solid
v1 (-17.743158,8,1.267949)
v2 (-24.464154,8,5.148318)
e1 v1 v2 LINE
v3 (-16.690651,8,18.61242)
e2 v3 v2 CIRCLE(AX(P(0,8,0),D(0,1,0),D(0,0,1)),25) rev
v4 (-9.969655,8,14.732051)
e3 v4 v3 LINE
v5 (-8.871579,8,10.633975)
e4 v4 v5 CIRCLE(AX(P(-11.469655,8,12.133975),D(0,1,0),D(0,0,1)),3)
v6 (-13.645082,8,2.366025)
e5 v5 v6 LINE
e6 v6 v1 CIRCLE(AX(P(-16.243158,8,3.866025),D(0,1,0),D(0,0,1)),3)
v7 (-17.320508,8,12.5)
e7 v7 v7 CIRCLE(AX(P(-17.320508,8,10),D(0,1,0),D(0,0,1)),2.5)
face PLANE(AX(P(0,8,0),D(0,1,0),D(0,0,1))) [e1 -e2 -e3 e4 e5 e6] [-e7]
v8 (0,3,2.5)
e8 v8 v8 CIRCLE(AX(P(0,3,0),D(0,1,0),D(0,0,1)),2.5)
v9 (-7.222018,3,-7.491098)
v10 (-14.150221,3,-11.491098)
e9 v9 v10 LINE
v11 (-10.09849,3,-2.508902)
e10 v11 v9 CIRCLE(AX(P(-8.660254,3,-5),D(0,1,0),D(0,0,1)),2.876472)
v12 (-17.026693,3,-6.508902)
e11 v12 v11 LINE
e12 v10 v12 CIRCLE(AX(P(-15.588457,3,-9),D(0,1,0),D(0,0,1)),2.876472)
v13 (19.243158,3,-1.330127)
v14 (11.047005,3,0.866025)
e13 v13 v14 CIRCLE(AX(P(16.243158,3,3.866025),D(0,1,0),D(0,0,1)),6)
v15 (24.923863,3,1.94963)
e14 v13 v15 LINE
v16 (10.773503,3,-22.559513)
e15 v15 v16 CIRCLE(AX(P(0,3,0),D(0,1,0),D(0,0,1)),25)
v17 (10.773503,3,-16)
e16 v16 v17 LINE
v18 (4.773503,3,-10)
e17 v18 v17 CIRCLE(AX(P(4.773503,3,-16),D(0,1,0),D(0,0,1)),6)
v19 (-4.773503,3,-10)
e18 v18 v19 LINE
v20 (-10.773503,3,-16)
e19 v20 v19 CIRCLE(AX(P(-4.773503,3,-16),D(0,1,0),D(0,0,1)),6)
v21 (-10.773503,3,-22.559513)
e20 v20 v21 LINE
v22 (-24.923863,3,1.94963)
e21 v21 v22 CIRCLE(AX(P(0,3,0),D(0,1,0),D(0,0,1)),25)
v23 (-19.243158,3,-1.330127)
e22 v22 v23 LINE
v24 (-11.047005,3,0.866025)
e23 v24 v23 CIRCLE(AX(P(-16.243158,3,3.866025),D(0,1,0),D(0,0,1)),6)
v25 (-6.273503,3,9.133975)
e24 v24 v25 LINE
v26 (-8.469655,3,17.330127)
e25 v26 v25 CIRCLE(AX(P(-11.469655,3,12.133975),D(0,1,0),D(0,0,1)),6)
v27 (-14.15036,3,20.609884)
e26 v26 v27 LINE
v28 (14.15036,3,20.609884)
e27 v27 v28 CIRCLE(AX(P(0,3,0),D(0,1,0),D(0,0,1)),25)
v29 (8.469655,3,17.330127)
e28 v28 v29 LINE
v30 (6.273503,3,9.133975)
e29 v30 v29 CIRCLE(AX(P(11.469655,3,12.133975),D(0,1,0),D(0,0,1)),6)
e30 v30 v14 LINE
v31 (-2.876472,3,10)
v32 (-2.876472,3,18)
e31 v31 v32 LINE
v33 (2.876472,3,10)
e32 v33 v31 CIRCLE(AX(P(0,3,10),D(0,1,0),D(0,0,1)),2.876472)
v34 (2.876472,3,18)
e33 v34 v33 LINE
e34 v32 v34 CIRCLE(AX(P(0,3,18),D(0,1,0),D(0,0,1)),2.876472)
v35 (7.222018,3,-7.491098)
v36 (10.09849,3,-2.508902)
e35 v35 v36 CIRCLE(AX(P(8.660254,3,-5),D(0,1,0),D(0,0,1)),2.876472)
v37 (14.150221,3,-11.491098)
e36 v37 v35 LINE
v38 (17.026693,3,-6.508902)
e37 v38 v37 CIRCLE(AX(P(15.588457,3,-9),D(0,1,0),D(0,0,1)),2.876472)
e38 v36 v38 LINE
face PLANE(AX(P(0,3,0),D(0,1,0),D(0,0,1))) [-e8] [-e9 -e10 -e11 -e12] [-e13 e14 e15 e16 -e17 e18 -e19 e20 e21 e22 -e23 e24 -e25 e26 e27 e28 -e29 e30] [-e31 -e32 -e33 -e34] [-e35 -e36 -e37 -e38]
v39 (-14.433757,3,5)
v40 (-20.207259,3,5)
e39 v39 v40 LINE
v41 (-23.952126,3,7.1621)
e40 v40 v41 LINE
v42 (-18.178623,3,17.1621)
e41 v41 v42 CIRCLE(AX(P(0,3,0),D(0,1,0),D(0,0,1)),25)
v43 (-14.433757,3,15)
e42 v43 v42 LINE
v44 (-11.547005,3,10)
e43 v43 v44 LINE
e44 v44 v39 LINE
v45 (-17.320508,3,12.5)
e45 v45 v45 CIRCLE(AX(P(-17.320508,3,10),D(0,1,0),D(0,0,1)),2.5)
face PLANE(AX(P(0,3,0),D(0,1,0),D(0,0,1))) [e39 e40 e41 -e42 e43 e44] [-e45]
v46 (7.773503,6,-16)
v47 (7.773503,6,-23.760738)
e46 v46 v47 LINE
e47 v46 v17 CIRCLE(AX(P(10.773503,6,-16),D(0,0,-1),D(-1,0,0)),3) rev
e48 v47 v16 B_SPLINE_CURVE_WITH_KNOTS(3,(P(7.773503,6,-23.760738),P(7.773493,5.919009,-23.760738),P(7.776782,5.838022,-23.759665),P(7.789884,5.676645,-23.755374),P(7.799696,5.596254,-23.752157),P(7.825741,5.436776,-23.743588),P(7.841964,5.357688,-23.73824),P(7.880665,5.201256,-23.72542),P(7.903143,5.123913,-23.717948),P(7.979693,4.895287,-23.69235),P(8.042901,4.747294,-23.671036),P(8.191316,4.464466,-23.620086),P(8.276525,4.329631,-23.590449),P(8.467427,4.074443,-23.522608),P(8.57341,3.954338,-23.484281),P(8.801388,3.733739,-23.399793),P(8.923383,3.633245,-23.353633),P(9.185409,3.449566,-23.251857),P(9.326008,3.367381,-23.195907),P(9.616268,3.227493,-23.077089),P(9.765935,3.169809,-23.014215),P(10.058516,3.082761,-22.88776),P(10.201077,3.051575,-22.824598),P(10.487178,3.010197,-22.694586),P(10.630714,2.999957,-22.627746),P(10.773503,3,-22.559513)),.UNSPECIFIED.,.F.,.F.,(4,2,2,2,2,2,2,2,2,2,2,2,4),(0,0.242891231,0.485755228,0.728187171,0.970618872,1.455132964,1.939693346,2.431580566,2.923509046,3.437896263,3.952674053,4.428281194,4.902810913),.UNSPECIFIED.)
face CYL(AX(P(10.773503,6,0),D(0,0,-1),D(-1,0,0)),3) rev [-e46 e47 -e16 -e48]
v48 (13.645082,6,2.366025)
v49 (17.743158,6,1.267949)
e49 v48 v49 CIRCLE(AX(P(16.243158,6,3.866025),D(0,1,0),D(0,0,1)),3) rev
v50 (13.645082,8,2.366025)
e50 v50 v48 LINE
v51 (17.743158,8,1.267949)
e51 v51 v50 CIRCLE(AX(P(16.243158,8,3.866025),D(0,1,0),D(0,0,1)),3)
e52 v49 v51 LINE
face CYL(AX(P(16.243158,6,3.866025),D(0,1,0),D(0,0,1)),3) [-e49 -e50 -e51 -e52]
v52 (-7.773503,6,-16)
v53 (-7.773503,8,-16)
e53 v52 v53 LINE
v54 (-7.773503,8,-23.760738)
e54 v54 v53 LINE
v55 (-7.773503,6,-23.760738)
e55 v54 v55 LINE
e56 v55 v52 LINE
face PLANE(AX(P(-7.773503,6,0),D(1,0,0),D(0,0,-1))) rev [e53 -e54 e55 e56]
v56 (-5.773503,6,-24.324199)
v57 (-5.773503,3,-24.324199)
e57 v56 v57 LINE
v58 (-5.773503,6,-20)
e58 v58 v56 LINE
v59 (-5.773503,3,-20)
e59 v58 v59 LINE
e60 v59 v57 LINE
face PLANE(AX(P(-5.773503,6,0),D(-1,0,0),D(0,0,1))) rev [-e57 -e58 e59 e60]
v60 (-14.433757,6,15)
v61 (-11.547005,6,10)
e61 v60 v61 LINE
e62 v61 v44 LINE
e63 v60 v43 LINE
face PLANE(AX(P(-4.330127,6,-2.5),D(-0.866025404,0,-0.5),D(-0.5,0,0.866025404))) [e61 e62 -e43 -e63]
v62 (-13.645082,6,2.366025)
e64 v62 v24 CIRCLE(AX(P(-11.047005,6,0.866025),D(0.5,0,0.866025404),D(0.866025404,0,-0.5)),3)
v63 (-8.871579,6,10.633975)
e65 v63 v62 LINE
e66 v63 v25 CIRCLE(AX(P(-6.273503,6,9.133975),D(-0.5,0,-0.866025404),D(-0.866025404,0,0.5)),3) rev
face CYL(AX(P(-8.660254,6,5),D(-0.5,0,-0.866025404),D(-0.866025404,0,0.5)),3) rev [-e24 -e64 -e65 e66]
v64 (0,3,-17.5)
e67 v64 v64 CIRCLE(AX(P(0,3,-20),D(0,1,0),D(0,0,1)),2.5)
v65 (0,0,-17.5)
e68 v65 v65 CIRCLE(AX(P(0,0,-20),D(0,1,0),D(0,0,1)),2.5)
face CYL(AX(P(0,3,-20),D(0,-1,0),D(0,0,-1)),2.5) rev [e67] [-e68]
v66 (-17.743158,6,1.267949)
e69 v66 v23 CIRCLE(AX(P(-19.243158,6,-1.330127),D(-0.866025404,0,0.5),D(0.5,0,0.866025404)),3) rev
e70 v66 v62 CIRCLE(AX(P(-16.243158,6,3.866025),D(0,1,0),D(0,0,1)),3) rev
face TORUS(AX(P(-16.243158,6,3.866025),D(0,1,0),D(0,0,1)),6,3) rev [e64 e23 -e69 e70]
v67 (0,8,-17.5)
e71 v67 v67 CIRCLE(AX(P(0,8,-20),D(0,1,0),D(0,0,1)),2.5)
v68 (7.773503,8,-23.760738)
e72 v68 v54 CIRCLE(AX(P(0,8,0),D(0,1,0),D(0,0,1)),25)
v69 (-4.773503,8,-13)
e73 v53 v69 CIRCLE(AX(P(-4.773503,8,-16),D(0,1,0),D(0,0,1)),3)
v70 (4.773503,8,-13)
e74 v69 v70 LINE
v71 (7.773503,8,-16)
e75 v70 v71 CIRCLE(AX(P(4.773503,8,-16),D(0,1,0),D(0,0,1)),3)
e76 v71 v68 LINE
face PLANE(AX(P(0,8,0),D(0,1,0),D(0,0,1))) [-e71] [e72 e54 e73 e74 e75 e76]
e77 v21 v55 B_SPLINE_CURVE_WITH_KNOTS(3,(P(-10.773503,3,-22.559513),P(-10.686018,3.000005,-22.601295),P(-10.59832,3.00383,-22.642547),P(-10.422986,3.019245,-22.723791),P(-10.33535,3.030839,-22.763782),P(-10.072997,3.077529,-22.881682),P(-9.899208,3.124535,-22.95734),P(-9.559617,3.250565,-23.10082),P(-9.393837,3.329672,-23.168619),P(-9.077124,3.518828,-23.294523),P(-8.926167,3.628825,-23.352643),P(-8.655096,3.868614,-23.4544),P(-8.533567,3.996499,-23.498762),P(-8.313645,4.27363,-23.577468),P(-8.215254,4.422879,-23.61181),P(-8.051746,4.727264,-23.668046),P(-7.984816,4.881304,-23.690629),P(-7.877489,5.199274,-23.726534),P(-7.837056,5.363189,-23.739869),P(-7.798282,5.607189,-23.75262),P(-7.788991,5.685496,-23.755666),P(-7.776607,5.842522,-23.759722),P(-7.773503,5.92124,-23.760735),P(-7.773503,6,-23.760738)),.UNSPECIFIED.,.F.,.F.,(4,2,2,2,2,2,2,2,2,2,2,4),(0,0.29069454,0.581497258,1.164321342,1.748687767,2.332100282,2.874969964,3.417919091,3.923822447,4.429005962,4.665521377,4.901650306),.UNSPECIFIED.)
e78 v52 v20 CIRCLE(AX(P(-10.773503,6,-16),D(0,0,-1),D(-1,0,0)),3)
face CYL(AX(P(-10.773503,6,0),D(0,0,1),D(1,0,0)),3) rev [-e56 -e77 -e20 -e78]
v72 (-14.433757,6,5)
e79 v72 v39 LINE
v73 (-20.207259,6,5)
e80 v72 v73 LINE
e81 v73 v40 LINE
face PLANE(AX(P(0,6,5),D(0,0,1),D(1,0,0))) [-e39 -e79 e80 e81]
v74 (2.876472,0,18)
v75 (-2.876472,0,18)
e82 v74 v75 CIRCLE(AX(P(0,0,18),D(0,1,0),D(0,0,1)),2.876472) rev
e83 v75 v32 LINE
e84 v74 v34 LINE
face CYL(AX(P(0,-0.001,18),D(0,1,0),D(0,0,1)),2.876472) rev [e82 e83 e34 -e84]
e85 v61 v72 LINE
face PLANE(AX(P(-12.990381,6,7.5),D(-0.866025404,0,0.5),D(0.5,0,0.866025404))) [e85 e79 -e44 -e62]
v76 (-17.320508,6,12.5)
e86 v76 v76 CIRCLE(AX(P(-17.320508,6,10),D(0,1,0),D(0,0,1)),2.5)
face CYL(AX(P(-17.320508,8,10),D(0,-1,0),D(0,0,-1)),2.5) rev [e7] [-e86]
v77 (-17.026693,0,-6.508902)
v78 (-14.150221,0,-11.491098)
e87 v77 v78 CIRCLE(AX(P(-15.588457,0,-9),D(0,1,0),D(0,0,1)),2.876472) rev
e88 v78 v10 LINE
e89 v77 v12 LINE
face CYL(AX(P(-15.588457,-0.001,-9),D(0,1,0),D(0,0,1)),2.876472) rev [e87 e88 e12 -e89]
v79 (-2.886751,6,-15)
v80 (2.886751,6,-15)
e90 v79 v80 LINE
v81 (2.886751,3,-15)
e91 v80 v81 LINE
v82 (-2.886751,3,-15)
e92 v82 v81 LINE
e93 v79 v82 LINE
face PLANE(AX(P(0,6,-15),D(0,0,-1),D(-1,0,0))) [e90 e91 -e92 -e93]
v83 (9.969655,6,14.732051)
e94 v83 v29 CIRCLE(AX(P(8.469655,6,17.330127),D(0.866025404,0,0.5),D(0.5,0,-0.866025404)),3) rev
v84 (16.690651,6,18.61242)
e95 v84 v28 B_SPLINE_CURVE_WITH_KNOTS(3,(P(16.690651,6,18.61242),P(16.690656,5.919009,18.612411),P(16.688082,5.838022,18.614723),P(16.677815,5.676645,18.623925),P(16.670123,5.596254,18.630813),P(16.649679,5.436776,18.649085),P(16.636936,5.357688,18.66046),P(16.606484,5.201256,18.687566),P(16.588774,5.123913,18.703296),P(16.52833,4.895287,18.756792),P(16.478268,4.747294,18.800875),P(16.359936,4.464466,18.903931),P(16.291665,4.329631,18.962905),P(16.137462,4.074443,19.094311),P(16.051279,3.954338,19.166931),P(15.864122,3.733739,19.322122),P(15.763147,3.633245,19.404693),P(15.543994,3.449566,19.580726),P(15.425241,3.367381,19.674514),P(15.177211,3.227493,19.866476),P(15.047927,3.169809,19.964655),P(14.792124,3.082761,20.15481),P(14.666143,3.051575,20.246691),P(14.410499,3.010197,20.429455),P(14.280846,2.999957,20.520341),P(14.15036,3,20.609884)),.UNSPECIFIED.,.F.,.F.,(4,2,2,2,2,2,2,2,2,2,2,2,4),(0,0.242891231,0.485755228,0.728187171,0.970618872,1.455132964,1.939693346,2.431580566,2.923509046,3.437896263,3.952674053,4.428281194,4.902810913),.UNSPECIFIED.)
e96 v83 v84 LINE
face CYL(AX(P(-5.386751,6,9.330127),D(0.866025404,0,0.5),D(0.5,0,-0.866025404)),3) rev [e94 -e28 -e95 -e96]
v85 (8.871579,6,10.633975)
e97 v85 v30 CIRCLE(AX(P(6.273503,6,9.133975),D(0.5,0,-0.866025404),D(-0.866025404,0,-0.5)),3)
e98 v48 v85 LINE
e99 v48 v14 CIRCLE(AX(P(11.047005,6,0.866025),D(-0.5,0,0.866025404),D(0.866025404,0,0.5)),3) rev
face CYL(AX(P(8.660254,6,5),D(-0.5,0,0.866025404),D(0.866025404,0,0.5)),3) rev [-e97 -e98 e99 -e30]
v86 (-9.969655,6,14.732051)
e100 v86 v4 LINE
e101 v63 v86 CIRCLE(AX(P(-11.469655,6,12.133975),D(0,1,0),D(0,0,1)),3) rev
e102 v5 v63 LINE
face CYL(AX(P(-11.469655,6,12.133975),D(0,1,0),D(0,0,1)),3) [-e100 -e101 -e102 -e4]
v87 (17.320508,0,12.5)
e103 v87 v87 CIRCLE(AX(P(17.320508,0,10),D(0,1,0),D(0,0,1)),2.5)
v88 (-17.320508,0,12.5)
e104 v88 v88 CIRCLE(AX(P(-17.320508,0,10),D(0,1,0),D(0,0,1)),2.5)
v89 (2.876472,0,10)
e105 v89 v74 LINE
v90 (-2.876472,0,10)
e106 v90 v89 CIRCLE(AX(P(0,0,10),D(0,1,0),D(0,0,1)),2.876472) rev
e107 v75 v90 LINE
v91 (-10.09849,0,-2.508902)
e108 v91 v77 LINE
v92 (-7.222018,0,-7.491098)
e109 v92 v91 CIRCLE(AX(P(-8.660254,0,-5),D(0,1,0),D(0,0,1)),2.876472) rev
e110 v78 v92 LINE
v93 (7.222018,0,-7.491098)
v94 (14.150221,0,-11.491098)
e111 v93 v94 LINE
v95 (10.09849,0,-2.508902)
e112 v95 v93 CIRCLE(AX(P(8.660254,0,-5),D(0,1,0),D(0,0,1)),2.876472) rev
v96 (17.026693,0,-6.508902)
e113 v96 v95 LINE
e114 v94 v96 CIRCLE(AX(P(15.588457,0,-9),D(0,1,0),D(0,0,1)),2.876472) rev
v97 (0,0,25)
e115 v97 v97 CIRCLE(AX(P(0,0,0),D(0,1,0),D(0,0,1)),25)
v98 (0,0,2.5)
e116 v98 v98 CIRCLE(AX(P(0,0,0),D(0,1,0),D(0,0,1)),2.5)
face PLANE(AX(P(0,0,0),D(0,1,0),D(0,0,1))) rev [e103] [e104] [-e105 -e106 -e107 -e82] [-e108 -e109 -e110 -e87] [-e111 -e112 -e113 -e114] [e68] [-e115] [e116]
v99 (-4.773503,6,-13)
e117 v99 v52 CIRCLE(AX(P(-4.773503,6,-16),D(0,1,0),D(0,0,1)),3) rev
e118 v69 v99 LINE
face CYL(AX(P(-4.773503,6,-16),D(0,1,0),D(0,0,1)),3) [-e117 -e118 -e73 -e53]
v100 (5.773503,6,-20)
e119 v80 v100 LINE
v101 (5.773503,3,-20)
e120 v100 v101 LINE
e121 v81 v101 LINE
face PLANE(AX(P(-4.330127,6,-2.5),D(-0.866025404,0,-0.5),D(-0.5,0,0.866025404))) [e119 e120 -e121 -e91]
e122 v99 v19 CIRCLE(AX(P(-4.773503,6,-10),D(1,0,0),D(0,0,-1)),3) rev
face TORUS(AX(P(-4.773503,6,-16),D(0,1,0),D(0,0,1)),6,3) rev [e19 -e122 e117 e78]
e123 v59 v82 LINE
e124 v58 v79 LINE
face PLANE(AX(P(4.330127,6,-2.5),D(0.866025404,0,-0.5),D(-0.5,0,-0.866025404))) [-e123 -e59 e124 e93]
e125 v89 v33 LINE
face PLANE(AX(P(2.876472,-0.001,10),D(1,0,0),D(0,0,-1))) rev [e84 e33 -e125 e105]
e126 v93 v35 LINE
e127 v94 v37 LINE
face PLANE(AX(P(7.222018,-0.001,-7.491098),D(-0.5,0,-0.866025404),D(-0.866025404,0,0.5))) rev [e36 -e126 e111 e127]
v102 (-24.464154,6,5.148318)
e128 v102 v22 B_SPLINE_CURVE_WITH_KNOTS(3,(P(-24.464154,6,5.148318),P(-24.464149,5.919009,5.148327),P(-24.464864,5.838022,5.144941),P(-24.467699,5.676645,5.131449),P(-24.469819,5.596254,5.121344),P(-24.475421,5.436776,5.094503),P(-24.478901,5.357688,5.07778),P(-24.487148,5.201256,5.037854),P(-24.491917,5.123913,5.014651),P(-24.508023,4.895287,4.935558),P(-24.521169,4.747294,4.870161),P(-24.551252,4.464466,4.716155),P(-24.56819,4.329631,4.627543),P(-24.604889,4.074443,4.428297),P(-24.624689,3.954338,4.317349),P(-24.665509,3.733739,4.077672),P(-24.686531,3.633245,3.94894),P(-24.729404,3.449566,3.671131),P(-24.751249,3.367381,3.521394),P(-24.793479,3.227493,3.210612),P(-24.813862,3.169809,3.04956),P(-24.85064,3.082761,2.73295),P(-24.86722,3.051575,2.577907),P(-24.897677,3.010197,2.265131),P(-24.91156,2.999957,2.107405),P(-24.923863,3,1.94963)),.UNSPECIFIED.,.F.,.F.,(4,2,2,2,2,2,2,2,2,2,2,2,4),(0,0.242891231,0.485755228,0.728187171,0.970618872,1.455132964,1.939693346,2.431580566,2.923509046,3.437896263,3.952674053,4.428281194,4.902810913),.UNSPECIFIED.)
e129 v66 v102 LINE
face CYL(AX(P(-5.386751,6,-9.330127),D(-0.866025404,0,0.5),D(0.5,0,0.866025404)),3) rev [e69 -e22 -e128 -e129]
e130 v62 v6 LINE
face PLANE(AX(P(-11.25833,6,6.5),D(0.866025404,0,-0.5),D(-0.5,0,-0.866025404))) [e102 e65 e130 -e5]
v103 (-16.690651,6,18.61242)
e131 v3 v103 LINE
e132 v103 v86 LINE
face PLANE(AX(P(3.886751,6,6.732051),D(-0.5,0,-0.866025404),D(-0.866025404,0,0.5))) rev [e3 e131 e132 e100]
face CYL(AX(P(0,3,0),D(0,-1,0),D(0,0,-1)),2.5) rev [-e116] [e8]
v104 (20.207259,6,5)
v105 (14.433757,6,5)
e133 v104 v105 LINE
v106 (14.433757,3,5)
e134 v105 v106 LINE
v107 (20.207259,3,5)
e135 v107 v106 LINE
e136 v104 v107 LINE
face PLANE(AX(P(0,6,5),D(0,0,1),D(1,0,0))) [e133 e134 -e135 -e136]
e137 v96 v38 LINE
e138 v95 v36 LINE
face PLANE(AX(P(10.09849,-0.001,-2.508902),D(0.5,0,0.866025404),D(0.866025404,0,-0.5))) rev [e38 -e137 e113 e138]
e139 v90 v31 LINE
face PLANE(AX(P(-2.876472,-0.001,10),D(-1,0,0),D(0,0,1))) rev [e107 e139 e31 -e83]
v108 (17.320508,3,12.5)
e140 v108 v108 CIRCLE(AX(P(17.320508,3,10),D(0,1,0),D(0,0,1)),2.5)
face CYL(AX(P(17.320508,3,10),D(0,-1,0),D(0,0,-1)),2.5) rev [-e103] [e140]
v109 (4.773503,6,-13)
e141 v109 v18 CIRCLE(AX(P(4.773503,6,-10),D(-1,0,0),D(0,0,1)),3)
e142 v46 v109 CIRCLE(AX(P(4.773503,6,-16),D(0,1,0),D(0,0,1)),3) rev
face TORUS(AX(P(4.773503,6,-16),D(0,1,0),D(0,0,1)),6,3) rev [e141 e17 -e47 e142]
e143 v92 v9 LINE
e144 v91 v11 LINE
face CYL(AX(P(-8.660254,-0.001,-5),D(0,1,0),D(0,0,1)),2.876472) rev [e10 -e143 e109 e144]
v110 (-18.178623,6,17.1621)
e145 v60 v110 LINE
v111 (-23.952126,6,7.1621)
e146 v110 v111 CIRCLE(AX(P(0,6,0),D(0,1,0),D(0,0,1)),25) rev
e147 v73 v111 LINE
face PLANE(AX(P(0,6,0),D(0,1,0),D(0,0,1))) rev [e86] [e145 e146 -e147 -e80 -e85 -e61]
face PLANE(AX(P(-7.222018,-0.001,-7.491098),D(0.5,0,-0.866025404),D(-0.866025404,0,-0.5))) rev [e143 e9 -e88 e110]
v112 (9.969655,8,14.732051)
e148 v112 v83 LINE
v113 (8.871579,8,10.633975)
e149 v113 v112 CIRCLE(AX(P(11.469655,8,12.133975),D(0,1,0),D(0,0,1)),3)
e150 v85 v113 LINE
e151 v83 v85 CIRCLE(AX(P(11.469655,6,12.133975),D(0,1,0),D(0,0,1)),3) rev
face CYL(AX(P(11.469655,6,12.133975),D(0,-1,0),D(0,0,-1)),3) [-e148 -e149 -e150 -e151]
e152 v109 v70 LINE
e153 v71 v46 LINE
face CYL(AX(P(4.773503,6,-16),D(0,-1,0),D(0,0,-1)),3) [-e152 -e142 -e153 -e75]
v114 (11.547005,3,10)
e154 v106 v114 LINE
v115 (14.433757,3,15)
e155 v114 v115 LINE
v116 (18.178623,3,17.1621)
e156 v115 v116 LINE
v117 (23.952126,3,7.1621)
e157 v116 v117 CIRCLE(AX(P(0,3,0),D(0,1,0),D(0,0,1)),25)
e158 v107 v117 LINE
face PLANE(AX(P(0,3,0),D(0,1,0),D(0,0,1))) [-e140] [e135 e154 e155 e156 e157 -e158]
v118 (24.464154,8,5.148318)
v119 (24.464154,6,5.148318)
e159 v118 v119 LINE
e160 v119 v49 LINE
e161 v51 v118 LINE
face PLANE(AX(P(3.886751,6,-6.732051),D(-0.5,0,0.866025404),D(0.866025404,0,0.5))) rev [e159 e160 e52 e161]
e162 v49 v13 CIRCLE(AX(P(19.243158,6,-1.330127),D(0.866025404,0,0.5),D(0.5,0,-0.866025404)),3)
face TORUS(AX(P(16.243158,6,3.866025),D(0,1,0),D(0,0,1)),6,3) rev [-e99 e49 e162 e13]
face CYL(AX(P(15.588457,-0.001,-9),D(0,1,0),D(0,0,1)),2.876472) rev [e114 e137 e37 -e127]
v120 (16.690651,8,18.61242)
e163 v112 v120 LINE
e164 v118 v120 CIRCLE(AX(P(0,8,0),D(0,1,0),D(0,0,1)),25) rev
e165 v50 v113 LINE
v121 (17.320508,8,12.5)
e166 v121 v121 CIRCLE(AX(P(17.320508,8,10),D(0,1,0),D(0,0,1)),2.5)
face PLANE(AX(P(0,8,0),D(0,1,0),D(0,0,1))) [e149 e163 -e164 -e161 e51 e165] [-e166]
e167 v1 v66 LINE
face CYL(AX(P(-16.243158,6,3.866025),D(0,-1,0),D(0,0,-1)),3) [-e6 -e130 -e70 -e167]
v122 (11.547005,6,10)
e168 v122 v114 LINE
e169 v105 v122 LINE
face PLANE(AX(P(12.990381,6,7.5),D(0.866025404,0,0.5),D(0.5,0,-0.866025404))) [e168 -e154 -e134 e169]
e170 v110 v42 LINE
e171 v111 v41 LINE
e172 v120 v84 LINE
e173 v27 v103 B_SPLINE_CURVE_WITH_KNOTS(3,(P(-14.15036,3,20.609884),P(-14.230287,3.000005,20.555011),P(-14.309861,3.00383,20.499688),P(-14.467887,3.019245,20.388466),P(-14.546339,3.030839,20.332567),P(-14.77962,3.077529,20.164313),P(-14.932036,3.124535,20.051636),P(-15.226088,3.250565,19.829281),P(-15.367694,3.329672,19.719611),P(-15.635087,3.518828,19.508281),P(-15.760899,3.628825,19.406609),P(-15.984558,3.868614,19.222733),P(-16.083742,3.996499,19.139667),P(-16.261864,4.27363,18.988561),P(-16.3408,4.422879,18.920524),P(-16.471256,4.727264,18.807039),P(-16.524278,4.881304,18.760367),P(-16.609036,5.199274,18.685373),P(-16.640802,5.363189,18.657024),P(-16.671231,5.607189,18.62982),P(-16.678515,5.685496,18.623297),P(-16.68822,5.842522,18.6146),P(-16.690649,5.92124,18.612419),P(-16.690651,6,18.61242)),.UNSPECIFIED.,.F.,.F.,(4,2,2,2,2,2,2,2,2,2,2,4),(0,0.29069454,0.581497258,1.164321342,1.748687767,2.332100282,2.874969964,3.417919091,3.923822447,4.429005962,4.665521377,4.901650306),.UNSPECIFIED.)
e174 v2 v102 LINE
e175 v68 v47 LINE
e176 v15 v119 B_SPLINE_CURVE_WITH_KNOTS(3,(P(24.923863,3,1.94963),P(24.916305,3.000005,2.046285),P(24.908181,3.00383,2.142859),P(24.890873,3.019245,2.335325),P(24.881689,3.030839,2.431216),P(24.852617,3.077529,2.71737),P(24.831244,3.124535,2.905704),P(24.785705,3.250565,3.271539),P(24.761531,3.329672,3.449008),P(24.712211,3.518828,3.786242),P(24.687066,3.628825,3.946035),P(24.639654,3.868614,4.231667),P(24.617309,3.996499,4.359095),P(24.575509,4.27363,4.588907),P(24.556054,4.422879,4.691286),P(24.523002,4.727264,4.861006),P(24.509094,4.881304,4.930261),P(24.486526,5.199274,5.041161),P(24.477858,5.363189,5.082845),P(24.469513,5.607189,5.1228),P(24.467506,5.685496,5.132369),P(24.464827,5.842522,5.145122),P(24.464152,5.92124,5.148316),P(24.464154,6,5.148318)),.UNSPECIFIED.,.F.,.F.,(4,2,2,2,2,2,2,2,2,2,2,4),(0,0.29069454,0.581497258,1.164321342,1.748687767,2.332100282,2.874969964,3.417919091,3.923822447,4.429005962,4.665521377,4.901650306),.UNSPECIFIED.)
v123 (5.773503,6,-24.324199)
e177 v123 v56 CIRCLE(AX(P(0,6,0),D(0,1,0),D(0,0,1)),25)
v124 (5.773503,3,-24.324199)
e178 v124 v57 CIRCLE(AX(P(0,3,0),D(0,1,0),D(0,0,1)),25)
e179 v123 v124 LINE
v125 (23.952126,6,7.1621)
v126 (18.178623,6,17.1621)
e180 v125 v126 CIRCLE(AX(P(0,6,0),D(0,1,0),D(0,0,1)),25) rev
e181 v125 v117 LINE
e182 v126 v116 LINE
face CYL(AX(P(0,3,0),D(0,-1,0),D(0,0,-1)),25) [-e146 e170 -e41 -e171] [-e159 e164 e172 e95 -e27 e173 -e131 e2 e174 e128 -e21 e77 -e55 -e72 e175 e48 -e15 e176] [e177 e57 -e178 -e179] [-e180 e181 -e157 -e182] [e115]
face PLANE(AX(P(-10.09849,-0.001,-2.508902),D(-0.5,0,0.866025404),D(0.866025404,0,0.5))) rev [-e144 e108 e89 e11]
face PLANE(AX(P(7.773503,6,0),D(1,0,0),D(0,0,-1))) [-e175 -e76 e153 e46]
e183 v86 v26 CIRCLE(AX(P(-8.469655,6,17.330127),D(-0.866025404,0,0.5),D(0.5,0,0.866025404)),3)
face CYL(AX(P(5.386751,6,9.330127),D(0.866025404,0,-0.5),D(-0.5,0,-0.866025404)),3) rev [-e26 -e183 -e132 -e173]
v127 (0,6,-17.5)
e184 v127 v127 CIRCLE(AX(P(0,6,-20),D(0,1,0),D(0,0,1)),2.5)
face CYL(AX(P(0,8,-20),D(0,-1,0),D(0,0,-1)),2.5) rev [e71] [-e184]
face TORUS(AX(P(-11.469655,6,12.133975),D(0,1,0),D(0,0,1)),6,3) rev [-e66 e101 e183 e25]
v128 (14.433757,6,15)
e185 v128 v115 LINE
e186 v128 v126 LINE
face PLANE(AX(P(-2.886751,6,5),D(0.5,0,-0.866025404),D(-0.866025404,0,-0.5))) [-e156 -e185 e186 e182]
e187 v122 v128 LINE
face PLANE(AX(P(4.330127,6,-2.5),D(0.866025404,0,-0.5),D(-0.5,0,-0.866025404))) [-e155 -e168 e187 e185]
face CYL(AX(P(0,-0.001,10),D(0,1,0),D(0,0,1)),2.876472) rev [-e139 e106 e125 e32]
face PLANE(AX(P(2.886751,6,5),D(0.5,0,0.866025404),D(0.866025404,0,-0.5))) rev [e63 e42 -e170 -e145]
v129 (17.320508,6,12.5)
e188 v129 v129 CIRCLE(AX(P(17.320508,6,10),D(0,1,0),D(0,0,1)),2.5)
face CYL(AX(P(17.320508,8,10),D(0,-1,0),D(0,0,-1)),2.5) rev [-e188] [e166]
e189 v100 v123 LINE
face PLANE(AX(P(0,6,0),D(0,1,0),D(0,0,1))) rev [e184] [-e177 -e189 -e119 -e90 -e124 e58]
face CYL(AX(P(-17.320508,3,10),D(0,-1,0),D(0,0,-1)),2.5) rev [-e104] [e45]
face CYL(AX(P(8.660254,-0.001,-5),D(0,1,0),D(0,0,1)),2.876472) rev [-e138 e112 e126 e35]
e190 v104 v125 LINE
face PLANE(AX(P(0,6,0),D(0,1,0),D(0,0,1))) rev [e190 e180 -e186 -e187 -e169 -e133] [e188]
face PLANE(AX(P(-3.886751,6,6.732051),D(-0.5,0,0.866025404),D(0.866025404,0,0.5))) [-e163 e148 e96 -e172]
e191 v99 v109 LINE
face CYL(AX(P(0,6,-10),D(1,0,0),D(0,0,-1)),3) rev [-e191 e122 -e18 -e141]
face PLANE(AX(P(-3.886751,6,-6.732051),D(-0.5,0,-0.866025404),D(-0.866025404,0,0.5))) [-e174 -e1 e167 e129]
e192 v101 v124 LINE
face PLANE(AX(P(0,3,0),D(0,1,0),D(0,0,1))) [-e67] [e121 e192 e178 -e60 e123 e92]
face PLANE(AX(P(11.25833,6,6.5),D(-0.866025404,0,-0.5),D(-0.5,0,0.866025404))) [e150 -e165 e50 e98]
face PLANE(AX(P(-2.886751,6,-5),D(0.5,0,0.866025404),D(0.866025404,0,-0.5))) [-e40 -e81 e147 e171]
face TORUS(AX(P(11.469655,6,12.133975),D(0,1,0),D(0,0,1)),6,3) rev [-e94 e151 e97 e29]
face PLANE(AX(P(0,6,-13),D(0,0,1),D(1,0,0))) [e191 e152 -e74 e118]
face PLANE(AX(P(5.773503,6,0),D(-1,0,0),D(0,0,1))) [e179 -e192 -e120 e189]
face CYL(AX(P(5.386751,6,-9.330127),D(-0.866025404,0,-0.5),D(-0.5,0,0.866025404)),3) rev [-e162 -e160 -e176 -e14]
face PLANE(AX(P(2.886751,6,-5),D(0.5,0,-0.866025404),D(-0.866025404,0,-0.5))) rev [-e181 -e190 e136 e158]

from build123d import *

# Parameters (mm, degrees)
SKETCH1_R           = 25
SKETCH1_R_2         = 2.5
BOSS_EXTRUDE1_DEPTH = 3
BOSS_EXTRUDE2_DEPTH = 3
SKETCH3_R           = 2.5
BOSS_EXTRUDE3_DEPTH = 2
CUT_EXTRUDE1_REACH  = 37.707
FILLET1_R           = 3


with BuildPart() as part:
    # Sketch1 → Boss-Extrude1 (new body)
    with BuildSketch(Plane(origin=(0, 0, 0), x_dir=(1, 0, 0), z_dir=(0, 1, 0))):
        with Locations(Location((0, 0, 0), (0, 0, 270))):
            Circle(SKETCH1_R)
        with Locations(Location((0, 20, 0), (0, 0, 270))):
            Circle(SKETCH1_R_2, mode=Mode.SUBTRACT)
        with Locations(Location((17.320508076, -10, 0), (0, 0, 270))):
            Circle(SKETCH1_R_2, mode=Mode.SUBTRACT)
        with Locations(Location((-17.320508076, -10, 0), (0, 0, 270))):
            Circle(SKETCH1_R_2, mode=Mode.SUBTRACT)
        with Locations(Location((0, 0, 0), (0, 0, 270))):
            Circle(SKETCH1_R_2, mode=Mode.SUBTRACT)
    extrude(amount=BOSS_EXTRUDE1_DEPTH)

    # Sketch2 → Boss-Extrude2 (add)
    with BuildSketch(Plane(origin=(0, 3, 0), x_dir=(1, 0, 0), z_dir=(0, 1, 0))):
        with BuildLine():
            Line((-2.886751346, 15), (-5.773502692, 20))
            Line((-5.773502692, 20), (-5.773502692, 24.324199199))
            ThreePointArc((-5.773502692, 24.324199199), (-6.779359183, 24.063255995), (-7.773502692, 23.760737697))
            Line((-7.773502692, 23.760737697), (-7.773502692, 13))
            Line((-7.773502692, 13), (7.773502692, 13))
            Line((7.773502692, 13), (7.773502692, 23.760737697))
            ThreePointArc((7.773502692, 23.760737697), (6.779359183, 24.063255995), (5.773502692, 24.324199199))
            Line((5.773502692, 24.324199199), (5.773502692, 20))
            Line((5.773502692, 20), (2.886751346, 15))
            Line((2.886751346, 15), (-2.886751346, 15))
        make_face()
        with BuildLine():
            Line((14.43375673, -5), (20.207259422, -5))
            Line((20.207259422, -5), (23.952125779, -7.162099599))
            ThreePointArc((23.952125779, -7.162099599), (24.229070581, -6.160530723), (24.464153804, -5.148318041))
            Line((24.464153804, -5.148318041), (15.145081595, 0.232050808))
            Line((15.145081595, 0.232050808), (7.371578903, -13.232050808))
            Line((7.371578903, -13.232050808), (16.690651112, -18.612419656))
            ThreePointArc((16.690651112, -18.612419656), (17.449711398, -17.902725271), (18.178623087, -17.162099599))
            Line((18.178623087, -17.162099599), (14.43375673, -15))
            Line((14.43375673, -15), (11.547005384, -10))
            Line((11.547005384, -10), (14.43375673, -5))
        make_face()
        with BuildLine():
            Line((-11.547005384, -10), (-14.43375673, -15))
            Line((-14.43375673, -15), (-18.178623087, -17.162099599))
            ThreePointArc((-18.178623087, -17.162099599), (-17.449711398, -17.902725271), (-16.690651112, -18.612419656))
            Line((-16.690651112, -18.612419656), (-7.371578903, -13.232050808))
            Line((-7.371578903, -13.232050808), (-15.145081595, 0.232050808))
            Line((-15.145081595, 0.232050808), (-24.464153804, -5.148318041))
            ThreePointArc((-24.464153804, -5.148318041), (-24.229070581, -6.160530723), (-23.952125779, -7.162099599))
            Line((-23.952125779, -7.162099599), (-20.207259422, -5))
            Line((-20.207259422, -5), (-14.43375673, -5))
            Line((-14.43375673, -5), (-11.547005384, -10))
        make_face()
    extrude(amount=BOSS_EXTRUDE2_DEPTH)

    # Sketch3 → Boss-Extrude3 (add)
    # profile 1 of 3: a face of its own
    with BuildSketch(Plane(origin=(0, 6, 0), x_dir=(1, 0, 0), z_dir=(0, 1, 0))):
        with BuildLine():
            Line((24.464153804, -5.148318041), (15.145081595, 0.232050808))
            Line((15.145081595, 0.232050808), (7.371578903, -13.232050808))
            Line((7.371578903, -13.232050808), (16.690651112, -18.612419656))
            ThreePointArc((16.690651112, -18.612419656), (21.650635095, -12.5), (24.464153804, -5.148318041))
        make_face()
        with Locations(Location((17.320508076, -10, 0), (0, 0, 270))):
            Circle(SKETCH3_R, mode=Mode.SUBTRACT)
    # profile 2 of 3: a face of its own
    with BuildSketch(Plane(origin=(0, 6, 0), x_dir=(1, 0, 0), z_dir=(0, 1, 0))):
        with BuildLine():
            Line((-7.773502692, 23.760737697), (-7.773502692, 13))
            Line((-7.773502692, 13), (7.773502692, 13))
            Line((7.773502692, 13), (7.773502692, 23.760737697))
            ThreePointArc((7.773502692, 23.760737697), (0, 25), (-7.773502692, 23.760737697))
        make_face()
        with Locations(Location((0, 20, 0), (0, 0, 270))):
            Circle(SKETCH3_R, mode=Mode.SUBTRACT)
    # profile 3 of 3: a face of its own
    with BuildSketch(Plane(origin=(0, 6, 0), x_dir=(1, 0, 0), z_dir=(0, 1, 0))):
        with BuildLine():
            Line((-16.690651112, -18.612419656), (-7.371578903, -13.232050808))
            Line((-7.371578903, -13.232050808), (-15.145081595, 0.232050808))
            Line((-15.145081595, 0.232050808), (-24.464153804, -5.148318041))
            ThreePointArc((-24.464153804, -5.148318041), (-21.650635095, -12.5), (-16.690651112, -18.612419656))
        make_face()
        with Locations(Location((-17.320508076, -10, 0), (0, 0, 270))):
            Circle(SKETCH3_R, mode=Mode.SUBTRACT)
    extrude(amount=BOSS_EXTRUDE3_DEPTH)

    # Sketch4 → Cut-Extrude1 (cut, up to next)
    with BuildSketch(Plane(origin=(0, 3, 0), x_dir=(1, 0, 0), z_dir=(0, 1, 0)), mode=Mode.PRIVATE) as cut_extrude1_sk1:
        with BuildLine():
            Line((2.876472216, -10), (2.876472216, -18))
            ThreePointArc((2.876472216, -18), (0, -20.876472216), (-2.876472216, -18))
            Line((-2.876472216, -18), (-2.876472216, -10))
            ThreePointArc((-2.876472216, -10), (0, -7.123527784), (2.876472216, -10))
        make_face()
    cut_extrude1_tool1 = extrude(cut_extrude1_sk1.sketch, amount=-CUT_EXTRUDE1_REACH, mode=Mode.PRIVATE) & part.part
    # Sketch4 → Cut-Extrude1 (cut, up to next)
    with BuildSketch(Plane(origin=(0, 3, 0), x_dir=(1, 0, 0), z_dir=(0, 1, 0)), mode=Mode.PRIVATE) as cut_extrude1_sk2:
        with BuildLine():
            Line((-10.098490146, 2.508901988), (-17.026693376, 6.508901988))
            ThreePointArc((-17.026693376, 6.508901988), (-18.07955528, 10.438236108), (-14.15022116, 11.491098012))
            Line((-14.15022116, 11.491098012), (-7.22201793, 7.491098012))
            ThreePointArc((-7.22201793, 7.491098012), (-6.169156026, 3.561763892), (-10.098490146, 2.508901988))
        make_face()
    cut_extrude1_tool2 = extrude(cut_extrude1_sk2.sketch, amount=-CUT_EXTRUDE1_REACH, mode=Mode.PRIVATE) & part.part
    # Sketch4 → Cut-Extrude1 (cut, up to next)
    with BuildSketch(Plane(origin=(0, 3, 0), x_dir=(1, 0, 0), z_dir=(0, 1, 0)), mode=Mode.PRIVATE) as cut_extrude1_sk3:
        with BuildLine():
            Line((7.22201793, 7.491098012), (14.15022116, 11.491098012))
            ThreePointArc((14.15022116, 11.491098012), (18.07955528, 10.438236108), (17.026693376, 6.508901988))
            Line((17.026693376, 6.508901988), (10.098490146, 2.508901988))
            ThreePointArc((10.098490146, 2.508901988), (6.169156026, 3.561763892), (7.22201793, 7.491098012))
        make_face()
    cut_extrude1_tool3 = extrude(cut_extrude1_sk3.sketch, amount=-CUT_EXTRUDE1_REACH, mode=Mode.PRIVATE) & part.part
    add(cut_extrude1_tool1.solids().sort_by_distance((0, 3, 14))[0], mode=Mode.SUBTRACT)
    add(cut_extrude1_tool2.solids().sort_by_distance((-12.124356, 3, -7))[0], mode=Mode.SUBTRACT)
    add(cut_extrude1_tool3.solids().sort_by_distance((12.124356, 3, -7))[0], mode=Mode.SUBTRACT)

    # Fillet1
    # the kernel refuses this fillet: 3 mm, written as the material it takes off along each edge
    with BuildSketch(Plane(origin=(-7.773502692, 3, -13), x_dir=(0, 0, -1), z_dir=(0, 1, 0)), Plane(origin=(7.773502692, 15.5, -13), x_dir=(0, 0, -1), z_dir=(0, -1, 0)), Plane(origin=(-7.371578903, 3, 13.232050808), x_dir=(-0.8660254037844431, 0, 0.49999999999999195), z_dir=(0, 1, 0)), Plane(origin=(-15.145081595, 3, -0.232050808), x_dir=(0.4999999999999916, 0, 0.8660254037844436), z_dir=(0, 1, 0)), Plane(origin=(15.145081595, 3, -0.232050808), x_dir=(0.8660254037844362, 0, 0.5000000000000043), z_dir=(0, 1, 0)), Plane(origin=(7.371578903, 15.5, 13.232050808), x_dir=(0.8660254037844362, 0, 0.5000000000000042), z_dir=(0, -1, 0))) as fillet1_piece_1:
        with BuildLine():
            CenterArc((FILLET1_R, -FILLET1_R), FILLET1_R, 90, 90)
            Line((0, -FILLET1_R), (0, 0))
            Line((0, 0), (FILLET1_R, 0))
        make_face()
    extrude(amount=12.5, mode=Mode.SUBTRACT)
    # the kernel refuses this fillet: 3 mm, written as the material it adds along each edge
    with BuildSketch(Plane(origin=(-7.773502692, 3, -31.260737697), x_dir=(-1, 0, 0), z_dir=(0, 0, 1))) as fillet1_2_piece_1_section:
        with BuildLine():
            CenterArc((FILLET1_R, -FILLET1_R), FILLET1_R, 90, 90)
            Line((0, -FILLET1_R), (0, 0))
            Line((0, 0), (FILLET1_R, 0))
        make_face()
    fillet1_2_piece_1 = extrude(amount=15.260737697, mode=Mode.PRIVATE)
    fillet1_2_piece_1 = fillet1_2_piece_1 & Plane(origin=(0, 3.679193908, 0), x_dir=(0, 0, 1), z_dir=(0, -1, 0)) * Cylinder(25, 43, mode=Mode.PRIVATE)
    add(fillet1_2_piece_1)
    with BuildSketch(Plane(origin=(7.773502692, 3, -16), x_dir=(1, 0, 0), z_dir=(0, 0, -1))) as fillet1_2_piece_2_section:
        with BuildLine():
            CenterArc((FILLET1_R, -FILLET1_R), FILLET1_R, 90, 90)
            Line((0, -FILLET1_R), (0, 0))
            Line((0, 0), (FILLET1_R, 0))
        make_face()
    fillet1_2_piece_2 = extrude(amount=15.260737697, mode=Mode.PRIVATE)
    fillet1_2_piece_2 = fillet1_2_piece_2 & Plane(origin=(0, 3.67919664, 0), x_dir=(0, 0, 1), z_dir=(0, -1, 0)) * Cylinder(25, 43, mode=Mode.PRIVATE)
    add(fillet1_2_piece_2)
    with BuildSketch(Plane(origin=(-4.773502692, 3, -13), x_dir=(0, 0, 1), z_dir=(1, 0, 0)), Plane(origin=(-8.871578903, 3, 10.633974596), x_dir=(0.8660254037844433, 0, -0.49999999999999195), z_dir=(-0.499999999999992, 0, -0.8660254037844434)), Plane(origin=(13.645081595, 3, 2.366025404), x_dir=(-0.8660254037844363, 0, -0.5000000000000041), z_dir=(-0.5000000000000041, 0, 0.8660254037844363))) as fillet1_2_piece_3:
        with BuildLine():
            CenterArc((FILLET1_R, -FILLET1_R), FILLET1_R, 90, 90)
            Line((0, -FILLET1_R), (0, 0))
            Line((0, 0), (FILLET1_R, 0))
        make_face()
    extrude(amount=9.547005384)
    with BuildSketch(Plane(origin=(-23.185841641, 3, 22.362419656), x_dir=(0.499999999999992, 0, 0.8660254037844433), z_dir=(0.8660254037844433, 0, -0.499999999999992))) as fillet1_2_piece_4_section:
        with BuildLine():
            CenterArc((FILLET1_R, -FILLET1_R), FILLET1_R, 90, 90)
            Line((0, -FILLET1_R), (0, 0))
            Line((0, 0), (FILLET1_R, 0))
        make_face()
    fillet1_2_piece_4 = extrude(amount=15.260737697, mode=Mode.PRIVATE)
    fillet1_2_piece_4 = fillet1_2_piece_4 & Plane(origin=(0, 3.679193908, 0), x_dir=(0, 0, 1), z_dir=(0, -1, 0)) * Cylinder(25, 43, mode=Mode.PRIVATE)
    add(fillet1_2_piece_4)
    with BuildSketch(Plane(origin=(-17.743157806, 3, 1.267949192), x_dir=(-0.49999999999999206, 0, -0.8660254037844433), z_dir=(-0.8660254037844433, 0, 0.49999999999999206))) as fillet1_2_piece_5_section:
        with BuildLine():
            CenterArc((FILLET1_R, -FILLET1_R), FILLET1_R, 90, 90)
            Line((0, -FILLET1_R), (0, 0))
            Line((0, 0), (FILLET1_R, 0))
        make_face()
    fillet1_2_piece_5 = extrude(amount=15.260737697, mode=Mode.PRIVATE)
    fillet1_2_piece_5 = fillet1_2_piece_5 & Plane(origin=(0, 3.67919664, 0), x_dir=(0, 0, 1), z_dir=(0, -1, 0)) * Cylinder(25, 43, mode=Mode.PRIVATE)
    add(fillet1_2_piece_5)
    with BuildSketch(Plane(origin=(30.959344332, 3, 8.898318041), x_dir=(0.5000000000000039, 0, -0.8660254037844364), z_dir=(-0.8660254037844364, 0, -0.5000000000000039))) as fillet1_2_piece_6_section:
        with BuildLine():
            CenterArc((FILLET1_R, -FILLET1_R), FILLET1_R, 90, 90)
            Line((0, -FILLET1_R), (0, 0))
            Line((0, 0), (FILLET1_R, 0))
        make_face()
    fillet1_2_piece_6 = extrude(amount=15.260737697, mode=Mode.PRIVATE)
    fillet1_2_piece_6 = fillet1_2_piece_6 & Plane(origin=(0, 3.679193908, 0), x_dir=(0, 0, 1), z_dir=(0, -1, 0)) * Cylinder(25, 43, mode=Mode.PRIVATE)
    add(fillet1_2_piece_6)
    with BuildSketch(Plane(origin=(9.969655115, 3, 14.732050808), x_dir=(-0.5000000000000041, 0, 0.8660254037844363), z_dir=(0.8660254037844364, 0, 0.5000000000000041))) as fillet1_2_piece_7_section:
        with BuildLine():
            CenterArc((FILLET1_R, -FILLET1_R), FILLET1_R, 90, 90)
            Line((0, -FILLET1_R), (0, 0))
            Line((0, 0), (FILLET1_R, 0))
        make_face()
    fillet1_2_piece_7 = extrude(amount=15.260737697, mode=Mode.PRIVATE)
    fillet1_2_piece_7 = fillet1_2_piece_7 & Plane(origin=(0, 3.67919664, 0), x_dir=(0, 0, 1), z_dir=(0, -1, 0)) * Cylinder(25, 43, mode=Mode.PRIVATE)
    add(fillet1_2_piece_7)
    with BuildSketch(Plane(origin=(16.243157806, 3, 3.866025404), x_dir=(0.5000000000000036, 0, -0.8660254037844366), z_dir=(0.8660254037844366, 0, 0.5000000000000036))) as fillet1_2_piece_8:
        with BuildLine():
            CenterArc((3 + FILLET1_R, FILLET1_R), FILLET1_R, 180, 90)
            Line((3, FILLET1_R), (3, 0))
            Line((3, 0), (3 + FILLET1_R, 0))
        make_face()
    revolve(axis=Axis((16.243157806, 3, 3.866025404), (0, 1, 0)), revolution_arc=90)
    with BuildSketch(Plane(origin=(11.469655115, 3, 12.133974596), x_dir=(-0.5000000000000041, 0, 0.8660254037844363), z_dir=(0.8660254037844363, 0, 0.5000000000000041))) as fillet1_2_piece_9:
        with BuildLine():
            CenterArc((3 + FILLET1_R, -FILLET1_R), FILLET1_R, 90, 90)
            Line((3, -FILLET1_R), (3, 0))
            Line((3, 0), (3 + FILLET1_R, 0))
        make_face()
    revolve(axis=Axis((11.469655115, 3, 12.133974596), (0, -1, 0)), revolution_arc=90)
    with BuildSketch(Plane(origin=(-11.469655115, 3, 12.133974596), x_dir=(0.4999999999999922, 0, 0.8660254037844431), z_dir=(-0.8660254037844431, 0, 0.4999999999999922))) as fillet1_2_piece_10:
        with BuildLine():
            CenterArc((3 + FILLET1_R, FILLET1_R), FILLET1_R, 180, 90)
            Line((3, FILLET1_R), (3, 0))
            Line((3, 0), (3 + FILLET1_R, 0))
        make_face()
    revolve(axis=Axis((-11.469655115, 3, 12.133974596), (0, 1, 0)), revolution_arc=90)
    with BuildSketch(Plane(origin=(-16.243157806, 3, 3.866025404), x_dir=(0.8660254037844433, 0, -0.49999999999999195), z_dir=(0.49999999999999195, 0, 0.8660254037844433))) as fillet1_2_piece_11:
        with BuildLine():
            CenterArc((3 + FILLET1_R, FILLET1_R), FILLET1_R, 180, 90)
            Line((3, FILLET1_R), (3, 0))
            Line((3, 0), (3 + FILLET1_R, 0))
        make_face()
    revolve(axis=Axis((-16.243157806, 3, 3.866025404), (0, 1, 0)), revolution_arc=90)
    with BuildSketch(Plane(origin=(-4.773502692, 3, -16), x_dir=(-1, 0, 0), z_dir=(0, 0, -1))) as fillet1_2_piece_12:
        with BuildLine():
            CenterArc((3 + FILLET1_R, FILLET1_R), FILLET1_R, 180, 90)
            Line((3, FILLET1_R), (3, 0))
            Line((3, 0), (3 + FILLET1_R, 0))
        make_face()
    revolve(axis=Axis((-4.773502692, 3, -16), (0, 1, 0)), revolution_arc=90)
    with BuildSketch(Plane(origin=(4.773502692, 3, -16), x_dir=(1, 0, 0), z_dir=(0, 0, -1))) as fillet1_2_piece_13:
        with BuildLine():
            CenterArc((3 + FILLET1_R, -FILLET1_R), FILLET1_R, 90, 90)
            Line((3, -FILLET1_R), (3, 0))
            Line((3, 0), (3 + FILLET1_R, 0))
        make_face()
    revolve(axis=Axis((4.773502692, 3, -16), (0, -1, 0)), revolution_arc=90)


solid = part.part
